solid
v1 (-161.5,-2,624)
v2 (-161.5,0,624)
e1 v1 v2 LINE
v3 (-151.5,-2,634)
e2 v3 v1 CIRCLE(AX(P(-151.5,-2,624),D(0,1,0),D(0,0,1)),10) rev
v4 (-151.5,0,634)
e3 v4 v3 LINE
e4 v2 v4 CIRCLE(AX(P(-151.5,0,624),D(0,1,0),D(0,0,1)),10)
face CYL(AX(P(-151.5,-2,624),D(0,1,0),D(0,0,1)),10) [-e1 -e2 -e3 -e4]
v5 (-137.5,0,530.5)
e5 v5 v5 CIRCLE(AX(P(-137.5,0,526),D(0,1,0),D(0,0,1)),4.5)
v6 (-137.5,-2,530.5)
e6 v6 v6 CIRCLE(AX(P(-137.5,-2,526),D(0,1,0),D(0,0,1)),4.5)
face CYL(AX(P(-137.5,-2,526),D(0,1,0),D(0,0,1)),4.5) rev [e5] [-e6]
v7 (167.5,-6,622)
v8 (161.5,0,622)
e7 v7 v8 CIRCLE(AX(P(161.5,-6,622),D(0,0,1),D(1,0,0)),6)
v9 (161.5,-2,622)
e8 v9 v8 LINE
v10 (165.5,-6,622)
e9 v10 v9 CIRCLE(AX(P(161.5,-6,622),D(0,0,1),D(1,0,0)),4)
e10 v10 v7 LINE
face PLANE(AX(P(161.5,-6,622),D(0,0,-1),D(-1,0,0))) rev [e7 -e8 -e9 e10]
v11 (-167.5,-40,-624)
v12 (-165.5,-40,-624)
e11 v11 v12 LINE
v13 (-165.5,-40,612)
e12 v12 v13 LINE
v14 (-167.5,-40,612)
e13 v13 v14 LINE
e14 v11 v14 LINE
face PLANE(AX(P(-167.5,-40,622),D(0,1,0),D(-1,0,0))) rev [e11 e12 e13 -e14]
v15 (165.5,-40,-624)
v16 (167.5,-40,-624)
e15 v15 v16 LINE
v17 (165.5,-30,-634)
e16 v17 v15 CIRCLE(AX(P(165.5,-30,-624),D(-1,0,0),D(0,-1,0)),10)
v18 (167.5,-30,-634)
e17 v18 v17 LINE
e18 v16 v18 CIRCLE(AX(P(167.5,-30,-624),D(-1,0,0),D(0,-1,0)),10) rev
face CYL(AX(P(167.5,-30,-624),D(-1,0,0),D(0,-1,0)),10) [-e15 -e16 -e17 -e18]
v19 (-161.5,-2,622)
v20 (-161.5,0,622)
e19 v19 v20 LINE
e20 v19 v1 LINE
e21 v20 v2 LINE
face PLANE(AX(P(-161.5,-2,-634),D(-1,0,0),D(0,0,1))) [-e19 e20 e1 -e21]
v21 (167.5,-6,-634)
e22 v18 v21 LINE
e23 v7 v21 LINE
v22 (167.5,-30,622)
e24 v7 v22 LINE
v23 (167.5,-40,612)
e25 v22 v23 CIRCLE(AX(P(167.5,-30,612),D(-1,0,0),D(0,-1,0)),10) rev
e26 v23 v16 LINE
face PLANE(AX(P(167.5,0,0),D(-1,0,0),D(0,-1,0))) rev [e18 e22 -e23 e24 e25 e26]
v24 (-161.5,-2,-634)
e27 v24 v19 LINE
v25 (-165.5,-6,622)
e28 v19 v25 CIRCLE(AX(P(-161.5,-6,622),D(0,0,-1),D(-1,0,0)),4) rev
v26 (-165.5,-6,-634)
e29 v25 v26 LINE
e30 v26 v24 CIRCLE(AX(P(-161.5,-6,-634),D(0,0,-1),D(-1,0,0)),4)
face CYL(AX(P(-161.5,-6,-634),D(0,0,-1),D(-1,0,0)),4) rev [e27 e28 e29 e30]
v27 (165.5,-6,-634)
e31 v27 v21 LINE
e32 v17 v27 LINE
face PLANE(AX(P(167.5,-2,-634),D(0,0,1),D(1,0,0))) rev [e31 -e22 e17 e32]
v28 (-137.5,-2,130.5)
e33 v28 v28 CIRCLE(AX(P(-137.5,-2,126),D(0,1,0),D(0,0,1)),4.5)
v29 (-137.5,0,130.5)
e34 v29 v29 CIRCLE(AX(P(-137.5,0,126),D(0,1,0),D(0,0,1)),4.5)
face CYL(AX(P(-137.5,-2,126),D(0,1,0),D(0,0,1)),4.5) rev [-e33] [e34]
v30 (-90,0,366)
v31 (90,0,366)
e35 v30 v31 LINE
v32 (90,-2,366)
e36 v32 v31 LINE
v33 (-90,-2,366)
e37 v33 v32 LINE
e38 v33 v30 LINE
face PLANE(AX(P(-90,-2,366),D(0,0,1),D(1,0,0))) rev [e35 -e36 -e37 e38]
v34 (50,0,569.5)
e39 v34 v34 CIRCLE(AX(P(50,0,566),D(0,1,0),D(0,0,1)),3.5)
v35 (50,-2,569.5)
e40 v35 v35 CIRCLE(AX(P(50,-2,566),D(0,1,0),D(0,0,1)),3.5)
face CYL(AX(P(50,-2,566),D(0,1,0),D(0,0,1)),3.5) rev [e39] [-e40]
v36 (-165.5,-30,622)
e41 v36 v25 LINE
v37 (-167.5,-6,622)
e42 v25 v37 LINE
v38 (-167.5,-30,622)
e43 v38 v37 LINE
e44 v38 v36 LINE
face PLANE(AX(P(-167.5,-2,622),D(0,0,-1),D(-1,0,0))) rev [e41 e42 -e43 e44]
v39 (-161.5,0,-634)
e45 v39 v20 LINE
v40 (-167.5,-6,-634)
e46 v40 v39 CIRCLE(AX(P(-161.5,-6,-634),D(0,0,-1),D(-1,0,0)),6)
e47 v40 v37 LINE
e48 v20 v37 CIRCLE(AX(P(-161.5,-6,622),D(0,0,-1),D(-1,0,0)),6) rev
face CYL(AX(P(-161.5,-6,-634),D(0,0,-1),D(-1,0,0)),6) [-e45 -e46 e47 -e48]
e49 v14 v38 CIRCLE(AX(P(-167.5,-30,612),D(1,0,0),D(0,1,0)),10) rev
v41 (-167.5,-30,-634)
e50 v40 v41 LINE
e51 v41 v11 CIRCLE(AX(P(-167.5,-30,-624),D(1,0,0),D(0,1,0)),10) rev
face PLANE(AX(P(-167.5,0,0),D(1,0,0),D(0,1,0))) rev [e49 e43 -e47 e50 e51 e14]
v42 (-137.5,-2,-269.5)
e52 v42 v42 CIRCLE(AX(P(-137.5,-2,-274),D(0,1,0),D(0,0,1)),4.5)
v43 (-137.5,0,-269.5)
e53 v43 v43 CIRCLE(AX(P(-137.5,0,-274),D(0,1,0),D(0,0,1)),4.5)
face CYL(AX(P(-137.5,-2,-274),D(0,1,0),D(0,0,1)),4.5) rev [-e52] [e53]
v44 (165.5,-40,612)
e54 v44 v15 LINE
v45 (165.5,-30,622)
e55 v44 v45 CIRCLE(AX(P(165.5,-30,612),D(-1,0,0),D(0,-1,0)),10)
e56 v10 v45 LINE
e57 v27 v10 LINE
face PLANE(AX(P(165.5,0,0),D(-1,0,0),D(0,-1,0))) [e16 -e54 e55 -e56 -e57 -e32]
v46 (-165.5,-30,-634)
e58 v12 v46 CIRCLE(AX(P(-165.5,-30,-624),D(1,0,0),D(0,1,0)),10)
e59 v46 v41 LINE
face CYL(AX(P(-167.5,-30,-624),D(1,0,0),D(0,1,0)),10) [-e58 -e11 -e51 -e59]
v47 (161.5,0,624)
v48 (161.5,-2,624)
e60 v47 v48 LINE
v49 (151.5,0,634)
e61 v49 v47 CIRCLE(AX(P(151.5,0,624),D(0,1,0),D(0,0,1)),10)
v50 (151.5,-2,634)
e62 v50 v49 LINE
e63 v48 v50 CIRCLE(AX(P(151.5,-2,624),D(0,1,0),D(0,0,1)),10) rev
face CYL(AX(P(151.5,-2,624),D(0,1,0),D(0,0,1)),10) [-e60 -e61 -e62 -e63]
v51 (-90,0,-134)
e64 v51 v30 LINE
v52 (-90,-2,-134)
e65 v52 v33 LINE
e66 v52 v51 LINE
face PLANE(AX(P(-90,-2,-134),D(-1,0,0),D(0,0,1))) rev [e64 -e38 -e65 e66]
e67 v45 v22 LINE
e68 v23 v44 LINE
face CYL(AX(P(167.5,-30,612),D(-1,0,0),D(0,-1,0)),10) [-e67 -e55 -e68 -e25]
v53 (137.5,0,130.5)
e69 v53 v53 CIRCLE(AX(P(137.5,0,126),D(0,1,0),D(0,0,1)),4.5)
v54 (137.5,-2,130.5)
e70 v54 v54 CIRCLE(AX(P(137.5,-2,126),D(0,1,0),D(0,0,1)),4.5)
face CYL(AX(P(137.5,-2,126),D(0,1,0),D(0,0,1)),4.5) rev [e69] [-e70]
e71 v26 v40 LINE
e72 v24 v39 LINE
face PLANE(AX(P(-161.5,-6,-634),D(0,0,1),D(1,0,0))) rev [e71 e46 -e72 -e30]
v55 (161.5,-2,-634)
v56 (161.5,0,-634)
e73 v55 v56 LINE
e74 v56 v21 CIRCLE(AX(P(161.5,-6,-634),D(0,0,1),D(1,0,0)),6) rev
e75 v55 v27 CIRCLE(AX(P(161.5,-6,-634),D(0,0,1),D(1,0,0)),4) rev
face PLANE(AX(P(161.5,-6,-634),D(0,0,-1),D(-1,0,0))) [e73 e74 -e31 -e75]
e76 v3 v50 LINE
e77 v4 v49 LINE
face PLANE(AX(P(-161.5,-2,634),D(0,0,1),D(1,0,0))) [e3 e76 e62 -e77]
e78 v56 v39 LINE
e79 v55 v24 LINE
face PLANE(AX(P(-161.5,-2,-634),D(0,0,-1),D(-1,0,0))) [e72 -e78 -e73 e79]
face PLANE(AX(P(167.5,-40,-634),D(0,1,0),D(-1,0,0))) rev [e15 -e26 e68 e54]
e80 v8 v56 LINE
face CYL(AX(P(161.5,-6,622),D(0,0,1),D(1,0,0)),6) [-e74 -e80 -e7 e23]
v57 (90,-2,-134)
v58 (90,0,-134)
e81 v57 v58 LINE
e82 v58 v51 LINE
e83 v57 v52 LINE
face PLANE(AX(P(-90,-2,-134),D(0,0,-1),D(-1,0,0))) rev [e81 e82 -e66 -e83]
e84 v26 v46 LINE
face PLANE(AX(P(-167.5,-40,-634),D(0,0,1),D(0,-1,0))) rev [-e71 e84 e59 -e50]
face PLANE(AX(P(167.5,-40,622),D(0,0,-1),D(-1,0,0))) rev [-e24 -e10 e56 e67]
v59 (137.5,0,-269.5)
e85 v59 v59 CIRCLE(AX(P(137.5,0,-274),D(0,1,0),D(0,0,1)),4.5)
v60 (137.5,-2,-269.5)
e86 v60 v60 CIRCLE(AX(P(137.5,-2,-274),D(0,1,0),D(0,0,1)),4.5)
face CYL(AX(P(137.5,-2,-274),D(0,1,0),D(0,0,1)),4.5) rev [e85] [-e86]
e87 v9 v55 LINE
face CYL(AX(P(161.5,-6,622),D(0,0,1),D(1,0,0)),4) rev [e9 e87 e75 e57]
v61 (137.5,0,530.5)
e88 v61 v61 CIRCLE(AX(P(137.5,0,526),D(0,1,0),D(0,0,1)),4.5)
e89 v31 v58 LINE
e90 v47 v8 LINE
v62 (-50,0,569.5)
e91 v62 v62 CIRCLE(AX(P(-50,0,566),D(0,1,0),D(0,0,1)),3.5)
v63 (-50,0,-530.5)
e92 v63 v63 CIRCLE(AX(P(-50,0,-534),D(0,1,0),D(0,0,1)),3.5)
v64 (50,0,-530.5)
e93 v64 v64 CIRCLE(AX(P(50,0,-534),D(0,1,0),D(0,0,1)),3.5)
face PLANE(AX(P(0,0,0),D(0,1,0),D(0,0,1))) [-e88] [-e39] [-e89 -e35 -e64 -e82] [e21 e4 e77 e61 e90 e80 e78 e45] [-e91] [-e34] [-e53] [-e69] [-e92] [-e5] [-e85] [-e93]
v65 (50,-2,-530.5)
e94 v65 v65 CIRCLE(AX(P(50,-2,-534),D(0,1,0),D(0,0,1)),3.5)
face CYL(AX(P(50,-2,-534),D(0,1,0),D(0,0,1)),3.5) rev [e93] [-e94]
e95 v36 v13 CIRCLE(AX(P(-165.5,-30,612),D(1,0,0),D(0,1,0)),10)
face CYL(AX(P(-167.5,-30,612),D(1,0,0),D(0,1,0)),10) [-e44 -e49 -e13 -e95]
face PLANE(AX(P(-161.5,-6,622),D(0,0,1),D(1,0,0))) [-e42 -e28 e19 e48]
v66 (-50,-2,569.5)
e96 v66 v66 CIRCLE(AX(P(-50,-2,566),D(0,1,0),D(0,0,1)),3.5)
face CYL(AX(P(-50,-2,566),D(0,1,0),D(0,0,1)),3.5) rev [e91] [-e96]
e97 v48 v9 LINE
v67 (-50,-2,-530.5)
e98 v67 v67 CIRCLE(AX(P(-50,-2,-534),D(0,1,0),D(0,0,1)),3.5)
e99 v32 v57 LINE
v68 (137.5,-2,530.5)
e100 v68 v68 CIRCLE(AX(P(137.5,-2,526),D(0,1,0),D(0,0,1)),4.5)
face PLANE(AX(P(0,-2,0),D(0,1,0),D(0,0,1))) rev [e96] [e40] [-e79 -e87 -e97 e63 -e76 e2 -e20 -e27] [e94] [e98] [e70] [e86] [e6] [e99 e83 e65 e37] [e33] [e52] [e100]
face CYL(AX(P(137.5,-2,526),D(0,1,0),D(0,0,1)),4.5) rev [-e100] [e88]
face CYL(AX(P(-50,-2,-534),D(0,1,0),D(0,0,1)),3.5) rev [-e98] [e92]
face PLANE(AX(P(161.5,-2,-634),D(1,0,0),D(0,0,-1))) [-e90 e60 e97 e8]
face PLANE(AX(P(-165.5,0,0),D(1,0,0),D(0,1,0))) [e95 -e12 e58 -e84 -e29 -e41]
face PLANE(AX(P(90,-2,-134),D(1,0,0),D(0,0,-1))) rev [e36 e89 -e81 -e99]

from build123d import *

# Parameters (mm, degrees)
SKETCH_1_W                  = 323
SKETCH_1_H                  = 1268
SKETCH_1_R                  = 4.5
SKETCH_1_R_2                = 3.5
SKETCH_1_W_2                = 180
SKETCH_1_H_2                = 500
SM_BASE_FLANGE_1_DEPTH      = 2
SM_EDGE_FLANGE_1_DEPTH      = 1256
SM_EDGE_FLANGE_1_BEND_DEPTH = 1256
FILLET_1_R                  = 10
FILLET_2_R                  = 10


# Sheet-metal steps are written as plain solids
with BuildPart() as part:
    # Sketch 1 → Базовая кромка1 (new body)
    with BuildSketch(Plane(origin=(0, 0, 0), x_dir=(1, 0, 0), z_dir=(0, 1, 0))):
        Rectangle(SKETCH_1_W, SKETCH_1_H)
        with Locations(Location((-137.5, -526, 0), (0, 0, 270))):
            Circle(SKETCH_1_R, mode=Mode.SUBTRACT)
        with Locations(Location((137.5, -526, 0), (0, 0, 270))):
            Circle(SKETCH_1_R, mode=Mode.SUBTRACT)
        with Locations(Location((-137.5, -126, 0), (0, 0, 270))):
            Circle(SKETCH_1_R, mode=Mode.SUBTRACT)
        with Locations(Location((137.5, -126, 0), (0, 0, 270))):
            Circle(SKETCH_1_R, mode=Mode.SUBTRACT)
        with Locations(Location((-137.5, 274, 0), (0, 0, 270))):
            Circle(SKETCH_1_R, mode=Mode.SUBTRACT)
        with Locations(Location((137.5, 274, 0), (0, 0, 270))):
            Circle(SKETCH_1_R, mode=Mode.SUBTRACT)
        with Locations(Location((-50, -566, 0), (0, 0, 270))):
            Circle(SKETCH_1_R_2, mode=Mode.SUBTRACT)
        with Locations(Location((50, -566, 0), (0, 0, 270))):
            Circle(SKETCH_1_R_2, mode=Mode.SUBTRACT)
        with Locations(Location((-50, 534, 0), (0, 0, 270))):
            Circle(SKETCH_1_R_2, mode=Mode.SUBTRACT)
        with Locations(Location((50, 534, 0), (0, 0, 270))):
            Circle(SKETCH_1_R_2, mode=Mode.SUBTRACT)
        with Locations((0, -116)):
            Rectangle(SKETCH_1_W_2, SKETCH_1_H_2, mode=Mode.SUBTRACT)
    extrude(amount=-SM_BASE_FLANGE_1_DEPTH)

    # Ребро-кромка1 section (across the edge) → Ребро-кромка1 (add)
    with BuildSketch(Plane(origin=(165.5, -2, -634), x_dir=(-1, 0, 0), z_dir=(0, 0, 1))):
        with BuildLine():
            Line((-2, 4), (-2, 38))
            Line((-2, 38), (0, 38))
            Line((0, 38), (0, 4))
            ThreePointArc((0, 4), (1.171572875, 1.171572875), (4, 0))
            Line((4, 0), (4, -2))
            ThreePointArc((4, -2), (-0.242640687, -0.242640687), (-2, 4))
        make_face()
    extrude(amount=SM_EDGE_FLANGE_1_DEPTH)

    # Ребро-кромка1 section 2 (across the edge) → Ребро-кромка1 bend (add)
    with BuildSketch(Plane(origin=(-165.5, -2, 622), x_dir=(1, 0, 0), z_dir=(0, 0, -1))):
        with BuildLine():
            Line((-2, 4), (-2, 38))
            Line((-2, 38), (0, 38))
            Line((0, 38), (0, 4))
            ThreePointArc((0, 4), (1.171572875, 1.171572875), (4, 0))
            Line((4, 0), (4, -2))
            ThreePointArc((4, -2), (-0.242640687, -0.242640687), (-2, 4))
        make_face()
    extrude(amount=SM_EDGE_FLANGE_1_BEND_DEPTH)

    # Скругление1
    fillet_1_edges = [part.edges().sort_by_distance(p)[0] for p in [
        (-166.5, -40, 622),
        (-166.5, -40, -634),
        (166.5, -40, -634),
        (166.5, -40, 622),
    ]]
    fillet(fillet_1_edges, radius=FILLET_1_R)

    # Скругление2
    fillet_2_edges = [part.edges().sort_by_distance(p)[0] for p in [
        (161.5, -1, 634),
        (-161.5, -1, 634),
    ]]
    fillet(fillet_2_edges, radius=FILLET_2_R)


solid = part.part
